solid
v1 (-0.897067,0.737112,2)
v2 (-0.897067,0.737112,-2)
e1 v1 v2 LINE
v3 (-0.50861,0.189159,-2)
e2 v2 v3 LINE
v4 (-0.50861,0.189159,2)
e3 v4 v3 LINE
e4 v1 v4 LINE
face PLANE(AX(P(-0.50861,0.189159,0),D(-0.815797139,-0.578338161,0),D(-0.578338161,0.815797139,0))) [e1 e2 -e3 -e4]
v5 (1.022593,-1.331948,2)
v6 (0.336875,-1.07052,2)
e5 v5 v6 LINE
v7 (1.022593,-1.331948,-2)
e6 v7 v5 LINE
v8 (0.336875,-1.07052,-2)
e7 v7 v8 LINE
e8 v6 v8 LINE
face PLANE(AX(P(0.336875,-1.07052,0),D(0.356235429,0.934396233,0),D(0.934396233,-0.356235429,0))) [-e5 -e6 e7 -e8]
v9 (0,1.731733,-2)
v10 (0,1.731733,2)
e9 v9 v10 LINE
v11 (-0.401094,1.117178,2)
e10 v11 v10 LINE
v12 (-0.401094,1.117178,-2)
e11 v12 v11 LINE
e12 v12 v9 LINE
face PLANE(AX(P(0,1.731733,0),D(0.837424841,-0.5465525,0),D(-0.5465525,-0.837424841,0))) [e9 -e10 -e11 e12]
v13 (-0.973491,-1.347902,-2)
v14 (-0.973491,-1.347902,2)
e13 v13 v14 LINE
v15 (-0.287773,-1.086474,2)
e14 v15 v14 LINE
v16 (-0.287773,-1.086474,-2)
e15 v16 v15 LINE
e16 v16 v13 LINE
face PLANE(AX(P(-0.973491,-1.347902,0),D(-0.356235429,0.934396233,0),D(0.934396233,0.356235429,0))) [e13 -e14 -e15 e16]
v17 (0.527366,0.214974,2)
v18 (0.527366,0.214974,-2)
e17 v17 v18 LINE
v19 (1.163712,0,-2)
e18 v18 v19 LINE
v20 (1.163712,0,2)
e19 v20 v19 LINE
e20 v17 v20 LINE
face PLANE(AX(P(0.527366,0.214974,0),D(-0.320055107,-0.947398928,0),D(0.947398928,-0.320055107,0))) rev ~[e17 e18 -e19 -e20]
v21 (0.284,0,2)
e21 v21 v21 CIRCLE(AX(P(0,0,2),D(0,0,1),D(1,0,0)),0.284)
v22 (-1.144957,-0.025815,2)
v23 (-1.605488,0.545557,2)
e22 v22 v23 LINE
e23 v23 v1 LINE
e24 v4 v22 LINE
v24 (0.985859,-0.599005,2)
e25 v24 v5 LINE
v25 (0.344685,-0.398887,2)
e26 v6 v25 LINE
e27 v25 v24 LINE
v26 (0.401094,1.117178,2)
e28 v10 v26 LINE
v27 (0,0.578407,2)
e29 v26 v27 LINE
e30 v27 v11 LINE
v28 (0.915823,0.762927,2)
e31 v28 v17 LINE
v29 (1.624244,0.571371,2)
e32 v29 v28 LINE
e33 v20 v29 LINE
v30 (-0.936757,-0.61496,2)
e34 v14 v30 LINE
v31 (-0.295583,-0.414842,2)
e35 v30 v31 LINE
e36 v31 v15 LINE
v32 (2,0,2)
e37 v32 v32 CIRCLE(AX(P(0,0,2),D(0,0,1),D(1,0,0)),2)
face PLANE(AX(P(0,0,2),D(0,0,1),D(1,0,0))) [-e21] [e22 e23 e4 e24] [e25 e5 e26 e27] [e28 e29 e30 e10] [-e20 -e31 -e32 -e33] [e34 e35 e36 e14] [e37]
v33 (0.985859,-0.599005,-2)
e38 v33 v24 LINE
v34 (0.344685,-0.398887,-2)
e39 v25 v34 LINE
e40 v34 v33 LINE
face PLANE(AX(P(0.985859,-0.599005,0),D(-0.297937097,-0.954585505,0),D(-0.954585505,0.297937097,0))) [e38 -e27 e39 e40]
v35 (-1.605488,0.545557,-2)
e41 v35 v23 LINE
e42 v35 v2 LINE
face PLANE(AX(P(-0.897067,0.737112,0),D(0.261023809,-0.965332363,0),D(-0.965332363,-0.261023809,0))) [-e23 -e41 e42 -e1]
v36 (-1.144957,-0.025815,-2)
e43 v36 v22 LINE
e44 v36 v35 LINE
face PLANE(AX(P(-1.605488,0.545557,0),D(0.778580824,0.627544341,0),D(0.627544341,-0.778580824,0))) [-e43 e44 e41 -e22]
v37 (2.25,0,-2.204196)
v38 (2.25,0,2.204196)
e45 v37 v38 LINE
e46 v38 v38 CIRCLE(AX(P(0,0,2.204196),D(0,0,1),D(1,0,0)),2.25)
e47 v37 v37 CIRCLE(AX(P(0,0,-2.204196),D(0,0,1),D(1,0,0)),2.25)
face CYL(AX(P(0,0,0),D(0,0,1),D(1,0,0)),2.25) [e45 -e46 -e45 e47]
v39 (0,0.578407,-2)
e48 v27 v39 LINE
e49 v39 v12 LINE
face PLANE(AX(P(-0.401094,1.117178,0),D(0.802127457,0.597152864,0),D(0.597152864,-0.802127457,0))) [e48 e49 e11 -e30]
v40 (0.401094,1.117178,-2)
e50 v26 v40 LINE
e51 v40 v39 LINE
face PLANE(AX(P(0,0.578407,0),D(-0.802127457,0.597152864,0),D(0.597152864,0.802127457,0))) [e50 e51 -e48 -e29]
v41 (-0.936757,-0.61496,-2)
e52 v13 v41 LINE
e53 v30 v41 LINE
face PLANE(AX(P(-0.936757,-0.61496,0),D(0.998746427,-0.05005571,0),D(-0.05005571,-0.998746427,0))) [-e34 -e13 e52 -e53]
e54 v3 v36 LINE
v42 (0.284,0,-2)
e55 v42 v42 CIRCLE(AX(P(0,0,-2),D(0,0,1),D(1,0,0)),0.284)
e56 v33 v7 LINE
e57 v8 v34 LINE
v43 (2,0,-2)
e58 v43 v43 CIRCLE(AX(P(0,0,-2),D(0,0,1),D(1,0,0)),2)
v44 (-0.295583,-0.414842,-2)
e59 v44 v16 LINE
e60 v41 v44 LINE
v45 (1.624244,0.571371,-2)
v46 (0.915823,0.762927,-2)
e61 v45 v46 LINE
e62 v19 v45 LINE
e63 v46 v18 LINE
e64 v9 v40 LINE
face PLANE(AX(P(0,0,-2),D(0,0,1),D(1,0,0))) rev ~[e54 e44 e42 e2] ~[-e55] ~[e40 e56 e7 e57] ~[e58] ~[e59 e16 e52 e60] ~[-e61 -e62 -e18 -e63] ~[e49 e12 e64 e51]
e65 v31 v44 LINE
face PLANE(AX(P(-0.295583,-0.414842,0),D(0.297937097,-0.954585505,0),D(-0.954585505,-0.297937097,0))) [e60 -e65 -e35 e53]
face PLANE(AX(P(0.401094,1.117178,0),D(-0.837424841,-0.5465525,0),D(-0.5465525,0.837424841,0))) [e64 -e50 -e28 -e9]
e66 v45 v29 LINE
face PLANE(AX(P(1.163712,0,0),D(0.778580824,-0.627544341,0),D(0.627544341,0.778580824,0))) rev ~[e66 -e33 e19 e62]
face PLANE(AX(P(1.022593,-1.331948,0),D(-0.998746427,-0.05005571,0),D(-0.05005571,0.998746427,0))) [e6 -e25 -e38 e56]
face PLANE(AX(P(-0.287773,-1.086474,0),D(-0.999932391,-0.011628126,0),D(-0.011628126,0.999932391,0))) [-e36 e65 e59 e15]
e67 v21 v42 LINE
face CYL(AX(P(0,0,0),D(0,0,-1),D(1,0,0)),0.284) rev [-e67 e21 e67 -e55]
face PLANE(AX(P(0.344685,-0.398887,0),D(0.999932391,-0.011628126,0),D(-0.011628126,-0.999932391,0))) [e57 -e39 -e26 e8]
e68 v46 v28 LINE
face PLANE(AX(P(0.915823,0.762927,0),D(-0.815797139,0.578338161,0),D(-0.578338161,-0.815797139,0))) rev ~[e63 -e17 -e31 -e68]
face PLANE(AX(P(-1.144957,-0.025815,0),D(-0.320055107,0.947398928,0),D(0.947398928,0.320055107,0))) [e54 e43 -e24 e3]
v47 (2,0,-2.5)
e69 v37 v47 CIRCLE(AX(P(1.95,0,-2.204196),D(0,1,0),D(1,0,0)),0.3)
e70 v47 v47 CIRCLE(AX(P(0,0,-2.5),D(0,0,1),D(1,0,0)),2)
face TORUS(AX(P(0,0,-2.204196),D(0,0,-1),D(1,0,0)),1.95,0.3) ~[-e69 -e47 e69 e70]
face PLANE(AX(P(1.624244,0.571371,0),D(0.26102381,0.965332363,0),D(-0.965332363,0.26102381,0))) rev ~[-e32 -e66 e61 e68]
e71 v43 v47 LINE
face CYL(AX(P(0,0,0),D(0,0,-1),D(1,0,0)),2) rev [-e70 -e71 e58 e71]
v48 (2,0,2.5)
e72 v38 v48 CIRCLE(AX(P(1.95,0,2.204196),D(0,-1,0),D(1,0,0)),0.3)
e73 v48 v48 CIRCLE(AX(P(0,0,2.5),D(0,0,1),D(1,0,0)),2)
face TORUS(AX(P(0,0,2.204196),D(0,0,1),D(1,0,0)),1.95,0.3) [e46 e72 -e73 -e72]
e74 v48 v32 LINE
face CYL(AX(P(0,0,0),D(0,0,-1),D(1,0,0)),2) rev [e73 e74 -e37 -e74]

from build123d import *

# Parameters (mm, degrees)
F0_R     = 2
F0_R_2   = 0.284
F1_DEPTH = 2
F0_R_3   = 2.25
F2_DEPTH = 2.5
F4_DEPTH = 12.5


# Not quite as in the source:
# - a fillet or chamfer that OpenCascade refuses, or shapes differently, is made with other operations: its cross-section is extruded or revolved along the edge and cut away or added


with BuildPart() as f1:
    # F0 (on Top) → F1 (new body, symmetric)
    with BuildSketch(Plane.XY):
        Circle(F0_R)
        Circle(F0_R_2, mode=Mode.SUBTRACT)
    extrude(amount=F1_DEPTH, both=True)

    # F0 (on Top) → F2 (join, symmetric)
    with BuildSketch(Plane.XY):
        Circle(F0_R_3)
        Circle(F0_R, mode=Mode.SUBTRACT)
    extrude(amount=F2_DEPTH, both=True)

    # F3 (on Top) → F4 (cut, symmetric)
    with BuildSketch(Plane.XY):
        Polygon((0.4010943762, 1.1171780688), (0, 1.7317327438), (-0.4010943762, 1.1171780688), (0, 0.5784067907), align=None)
        Polygon((-0.8970670571, 0.7371121703), (-1.605488264, 0.5455565888), (-1.1449570143, -0.0258146699), (-0.508610101, 0.1891592692), align=None)
        Polygon((-0.9367568521, -0.6149595416), (-0.9734908601, -1.3479020768), (-0.2877725187, -1.0864742598), (-0.2955828739, -0.4148417807), align=None)
        Polygon((0.3368749389, -1.0705199164), (1.0225932803, -1.3319477334), (0.9858592722, -0.5990051982), (0.344685294, -0.3988874373), align=None)
        Polygon((1.1637124699, 0), (1.6242437196, 0.5713712587), (0.9158225127, 0.7629268403), (0.5273655565, 0.2149739391), align=None)
    extrude(amount=F4_DEPTH, both=True, mode=Mode.SUBTRACT)

    # F5: fillet of radius 0.3 on 3 edges, made by hand

    # F5_s1 → F5_t2 (revolve, cut)
    with BuildSketch(Plane.XZ):
        with BuildLine():
            ThreePointArc((2.25, -2.2041960108), (2.1791287847, -2.3978451782), (2, -2.5))
            Line((2, -2.5), (2.25, -2.5))
            Line((2.25, -2.5), (2.25, -2.2041960108))
        make_face()
    revolve(axis=Axis((0, 0, -2.5), (0, 0, 1)), mode=Mode.SUBTRACT)

    # F5_s3 → F5_t4 (revolve, cut)
    with BuildSketch(Plane.XZ):
        with BuildLine():
            ThreePointArc((2.25, 2.2041960108), (2.1791287847, 2.3978451782), (2, 2.5))
            Line((2, 2.5), (2.25, 2.5))
            Line((2.25, 2.5), (2.25, 2.2041960108))
        make_face()
    revolve(axis=Axis((0, 0, 2.5), (0, 0, 1)), mode=Mode.SUBTRACT)


solid = f1.part
